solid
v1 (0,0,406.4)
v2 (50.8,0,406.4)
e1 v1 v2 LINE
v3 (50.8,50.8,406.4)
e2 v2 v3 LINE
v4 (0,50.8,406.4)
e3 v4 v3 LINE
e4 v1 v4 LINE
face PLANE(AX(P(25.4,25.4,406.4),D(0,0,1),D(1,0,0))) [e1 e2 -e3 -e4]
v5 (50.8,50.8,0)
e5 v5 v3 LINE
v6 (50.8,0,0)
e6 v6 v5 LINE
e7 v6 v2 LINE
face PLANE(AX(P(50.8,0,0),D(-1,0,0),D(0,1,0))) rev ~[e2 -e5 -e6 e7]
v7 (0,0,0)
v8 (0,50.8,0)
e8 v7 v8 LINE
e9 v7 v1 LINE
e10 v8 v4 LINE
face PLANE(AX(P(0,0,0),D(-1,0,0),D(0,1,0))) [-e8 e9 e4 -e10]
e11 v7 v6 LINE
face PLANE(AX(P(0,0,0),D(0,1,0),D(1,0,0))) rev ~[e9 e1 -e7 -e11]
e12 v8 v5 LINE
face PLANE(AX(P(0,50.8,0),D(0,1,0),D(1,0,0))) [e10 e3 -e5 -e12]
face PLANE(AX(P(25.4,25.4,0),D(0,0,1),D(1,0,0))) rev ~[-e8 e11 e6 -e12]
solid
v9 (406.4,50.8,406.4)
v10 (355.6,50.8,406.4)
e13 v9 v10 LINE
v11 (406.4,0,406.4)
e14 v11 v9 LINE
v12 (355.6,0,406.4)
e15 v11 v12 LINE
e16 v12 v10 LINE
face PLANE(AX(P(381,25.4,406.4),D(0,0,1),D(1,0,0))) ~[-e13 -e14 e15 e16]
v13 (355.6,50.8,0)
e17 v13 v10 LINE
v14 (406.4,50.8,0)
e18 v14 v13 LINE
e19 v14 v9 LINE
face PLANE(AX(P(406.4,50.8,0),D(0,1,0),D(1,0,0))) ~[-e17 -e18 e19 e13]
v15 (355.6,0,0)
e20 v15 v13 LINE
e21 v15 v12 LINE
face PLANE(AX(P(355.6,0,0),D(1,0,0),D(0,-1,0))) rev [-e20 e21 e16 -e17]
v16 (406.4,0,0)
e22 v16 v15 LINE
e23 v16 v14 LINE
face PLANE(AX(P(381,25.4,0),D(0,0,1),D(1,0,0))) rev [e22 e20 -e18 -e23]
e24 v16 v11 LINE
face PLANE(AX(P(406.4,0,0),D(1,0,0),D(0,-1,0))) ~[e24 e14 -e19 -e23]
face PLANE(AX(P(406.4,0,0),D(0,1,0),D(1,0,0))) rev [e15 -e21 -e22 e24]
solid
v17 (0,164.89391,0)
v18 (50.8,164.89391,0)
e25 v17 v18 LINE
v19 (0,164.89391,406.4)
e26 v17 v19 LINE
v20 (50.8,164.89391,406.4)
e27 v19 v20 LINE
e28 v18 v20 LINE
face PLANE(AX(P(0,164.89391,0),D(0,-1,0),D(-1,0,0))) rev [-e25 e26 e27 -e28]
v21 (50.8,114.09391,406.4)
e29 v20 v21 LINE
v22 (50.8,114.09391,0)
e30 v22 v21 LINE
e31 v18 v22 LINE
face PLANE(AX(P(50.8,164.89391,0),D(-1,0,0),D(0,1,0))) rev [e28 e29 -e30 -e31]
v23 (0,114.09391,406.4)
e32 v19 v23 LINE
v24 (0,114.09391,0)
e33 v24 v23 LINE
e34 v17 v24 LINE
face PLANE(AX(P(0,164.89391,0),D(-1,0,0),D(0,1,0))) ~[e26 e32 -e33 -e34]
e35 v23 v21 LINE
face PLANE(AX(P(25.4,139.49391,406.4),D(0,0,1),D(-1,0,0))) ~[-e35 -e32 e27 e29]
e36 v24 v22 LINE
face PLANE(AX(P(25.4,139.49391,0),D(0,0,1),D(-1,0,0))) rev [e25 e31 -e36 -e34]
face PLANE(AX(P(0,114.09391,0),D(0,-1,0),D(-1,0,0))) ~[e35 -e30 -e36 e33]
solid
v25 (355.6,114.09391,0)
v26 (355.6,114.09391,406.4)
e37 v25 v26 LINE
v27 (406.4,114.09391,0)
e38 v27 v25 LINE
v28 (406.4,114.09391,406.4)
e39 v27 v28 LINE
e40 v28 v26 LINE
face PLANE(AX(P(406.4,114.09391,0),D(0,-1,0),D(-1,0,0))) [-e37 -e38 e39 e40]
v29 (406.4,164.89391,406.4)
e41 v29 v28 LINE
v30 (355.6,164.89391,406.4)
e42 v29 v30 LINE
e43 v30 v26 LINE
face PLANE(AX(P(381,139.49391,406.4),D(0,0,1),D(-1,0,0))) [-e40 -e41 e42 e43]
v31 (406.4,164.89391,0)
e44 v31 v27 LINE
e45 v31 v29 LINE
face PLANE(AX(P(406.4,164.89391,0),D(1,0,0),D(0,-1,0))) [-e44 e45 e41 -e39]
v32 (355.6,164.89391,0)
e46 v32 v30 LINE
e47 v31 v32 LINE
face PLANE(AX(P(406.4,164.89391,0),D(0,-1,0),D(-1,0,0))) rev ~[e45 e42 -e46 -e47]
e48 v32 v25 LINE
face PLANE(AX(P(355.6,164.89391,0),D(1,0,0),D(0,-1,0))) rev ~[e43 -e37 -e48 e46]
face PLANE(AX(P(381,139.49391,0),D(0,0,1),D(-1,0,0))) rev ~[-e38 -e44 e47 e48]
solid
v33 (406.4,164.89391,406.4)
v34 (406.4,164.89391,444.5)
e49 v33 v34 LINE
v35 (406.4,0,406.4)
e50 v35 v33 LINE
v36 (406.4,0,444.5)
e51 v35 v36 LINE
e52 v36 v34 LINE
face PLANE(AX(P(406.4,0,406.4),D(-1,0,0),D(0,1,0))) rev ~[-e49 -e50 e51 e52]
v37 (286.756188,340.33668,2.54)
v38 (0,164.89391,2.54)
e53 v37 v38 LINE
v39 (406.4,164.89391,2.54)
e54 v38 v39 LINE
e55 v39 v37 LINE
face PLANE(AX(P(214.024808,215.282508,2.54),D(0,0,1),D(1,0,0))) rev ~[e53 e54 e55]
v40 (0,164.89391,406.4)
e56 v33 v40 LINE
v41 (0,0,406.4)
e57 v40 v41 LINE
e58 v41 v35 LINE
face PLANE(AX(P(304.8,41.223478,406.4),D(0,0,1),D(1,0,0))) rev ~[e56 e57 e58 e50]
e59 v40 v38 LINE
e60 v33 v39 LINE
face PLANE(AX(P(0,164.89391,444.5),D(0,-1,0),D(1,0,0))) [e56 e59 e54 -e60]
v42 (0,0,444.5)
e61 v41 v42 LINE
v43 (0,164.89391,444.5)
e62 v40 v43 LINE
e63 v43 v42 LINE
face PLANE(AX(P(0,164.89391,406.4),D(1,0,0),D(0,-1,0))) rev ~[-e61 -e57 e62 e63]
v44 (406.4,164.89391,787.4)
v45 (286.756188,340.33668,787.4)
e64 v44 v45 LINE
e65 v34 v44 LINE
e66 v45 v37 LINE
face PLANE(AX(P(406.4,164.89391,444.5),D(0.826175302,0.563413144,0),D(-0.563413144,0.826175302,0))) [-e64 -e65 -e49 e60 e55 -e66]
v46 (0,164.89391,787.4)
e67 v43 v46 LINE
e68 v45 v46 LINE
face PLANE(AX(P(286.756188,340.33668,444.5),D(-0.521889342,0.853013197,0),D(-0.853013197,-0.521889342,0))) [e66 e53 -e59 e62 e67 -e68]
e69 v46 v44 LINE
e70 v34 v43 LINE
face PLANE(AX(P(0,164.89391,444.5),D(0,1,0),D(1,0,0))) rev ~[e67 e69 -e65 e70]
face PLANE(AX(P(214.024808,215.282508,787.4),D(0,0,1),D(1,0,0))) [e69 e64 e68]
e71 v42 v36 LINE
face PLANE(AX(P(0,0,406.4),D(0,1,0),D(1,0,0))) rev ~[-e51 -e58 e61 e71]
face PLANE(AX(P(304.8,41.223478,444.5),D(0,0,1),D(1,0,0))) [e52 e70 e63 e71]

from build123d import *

# Parameters (mm, degrees)
F0_W          = 50.8
F0_H          = 50.8
F1_DEPTH      = 406.4
F2_W          = 203.2
F2_H          = 82.4469551444
F2_W_2        = 50.8
F2_H_2        = 50.8
F7_DEPTH      = 38.1
F9_DEPTH      = 342.9
F9_DEPTH_BACK = 441.96


# Not quite as in the source:
# - a feature names something its author has since deleted; it is built from what else it names


with BuildPart() as f1:
    # F0 (on Top) → F1 (new body)
    with BuildSketch(Plane.XY):
        with Locations((25.4, 25.4)):
            Rectangle(F0_W, F0_H)
    extrude(amount=F1_DEPTH)


with BuildPart() as f5_1:
    # F5: instance of F1
    add(f1.part.mirror(Plane.XZ.offset(-82.4469551444)))


with BuildPart() as f6_1:
    # F6: instance of F5_1
    add(f5_1.part.mirror(Plane.YZ.offset(203.2)))


with BuildPart() as f6_2:
    # F6: instance of F1
    add(f1.part.mirror(Plane.YZ.offset(203.2)))


with BuildPart() as f7:
    # F2 (on face) → F7 (new body)
    with BuildSketch(Plane.XY.offset(406.4)):
        with Locations((304.8, 41.2234775722)):
            Rectangle(F2_W, F2_H)
        with Locations((101.6, 123.6704327166)):
            Rectangle(F2_W, F2_H)
        Polygon((50.8, 50.8), (50.8, 0), (203.2, 0), (203.2, 82.4469551444), (0, 82.4469551444), (0, 50.8), align=None)
        with Locations((304.8, 123.6704327166)):
            Rectangle(F2_W, F2_H)
        with Locations((25.4, 25.4)):
            Rectangle(F2_W_2, F2_H_2)
    extrude(amount=F7_DEPTH)

    # F8 (on face) → F9 (join, two sides)
    with BuildSketch(Plane.XY.offset(444.5)) as f9_sk:
        Polygon((286.7561876774, 340.3366804123), (0, 164.8939102888), (406.4, 164.8939102888), align=None)
    extrude(amount=F9_DEPTH)
    extrude(f9_sk.sketch, amount=-F9_DEPTH_BACK)


solid = Compound([f1.part, f5_1.part, f6_1.part, f6_2.part, f7.part])
